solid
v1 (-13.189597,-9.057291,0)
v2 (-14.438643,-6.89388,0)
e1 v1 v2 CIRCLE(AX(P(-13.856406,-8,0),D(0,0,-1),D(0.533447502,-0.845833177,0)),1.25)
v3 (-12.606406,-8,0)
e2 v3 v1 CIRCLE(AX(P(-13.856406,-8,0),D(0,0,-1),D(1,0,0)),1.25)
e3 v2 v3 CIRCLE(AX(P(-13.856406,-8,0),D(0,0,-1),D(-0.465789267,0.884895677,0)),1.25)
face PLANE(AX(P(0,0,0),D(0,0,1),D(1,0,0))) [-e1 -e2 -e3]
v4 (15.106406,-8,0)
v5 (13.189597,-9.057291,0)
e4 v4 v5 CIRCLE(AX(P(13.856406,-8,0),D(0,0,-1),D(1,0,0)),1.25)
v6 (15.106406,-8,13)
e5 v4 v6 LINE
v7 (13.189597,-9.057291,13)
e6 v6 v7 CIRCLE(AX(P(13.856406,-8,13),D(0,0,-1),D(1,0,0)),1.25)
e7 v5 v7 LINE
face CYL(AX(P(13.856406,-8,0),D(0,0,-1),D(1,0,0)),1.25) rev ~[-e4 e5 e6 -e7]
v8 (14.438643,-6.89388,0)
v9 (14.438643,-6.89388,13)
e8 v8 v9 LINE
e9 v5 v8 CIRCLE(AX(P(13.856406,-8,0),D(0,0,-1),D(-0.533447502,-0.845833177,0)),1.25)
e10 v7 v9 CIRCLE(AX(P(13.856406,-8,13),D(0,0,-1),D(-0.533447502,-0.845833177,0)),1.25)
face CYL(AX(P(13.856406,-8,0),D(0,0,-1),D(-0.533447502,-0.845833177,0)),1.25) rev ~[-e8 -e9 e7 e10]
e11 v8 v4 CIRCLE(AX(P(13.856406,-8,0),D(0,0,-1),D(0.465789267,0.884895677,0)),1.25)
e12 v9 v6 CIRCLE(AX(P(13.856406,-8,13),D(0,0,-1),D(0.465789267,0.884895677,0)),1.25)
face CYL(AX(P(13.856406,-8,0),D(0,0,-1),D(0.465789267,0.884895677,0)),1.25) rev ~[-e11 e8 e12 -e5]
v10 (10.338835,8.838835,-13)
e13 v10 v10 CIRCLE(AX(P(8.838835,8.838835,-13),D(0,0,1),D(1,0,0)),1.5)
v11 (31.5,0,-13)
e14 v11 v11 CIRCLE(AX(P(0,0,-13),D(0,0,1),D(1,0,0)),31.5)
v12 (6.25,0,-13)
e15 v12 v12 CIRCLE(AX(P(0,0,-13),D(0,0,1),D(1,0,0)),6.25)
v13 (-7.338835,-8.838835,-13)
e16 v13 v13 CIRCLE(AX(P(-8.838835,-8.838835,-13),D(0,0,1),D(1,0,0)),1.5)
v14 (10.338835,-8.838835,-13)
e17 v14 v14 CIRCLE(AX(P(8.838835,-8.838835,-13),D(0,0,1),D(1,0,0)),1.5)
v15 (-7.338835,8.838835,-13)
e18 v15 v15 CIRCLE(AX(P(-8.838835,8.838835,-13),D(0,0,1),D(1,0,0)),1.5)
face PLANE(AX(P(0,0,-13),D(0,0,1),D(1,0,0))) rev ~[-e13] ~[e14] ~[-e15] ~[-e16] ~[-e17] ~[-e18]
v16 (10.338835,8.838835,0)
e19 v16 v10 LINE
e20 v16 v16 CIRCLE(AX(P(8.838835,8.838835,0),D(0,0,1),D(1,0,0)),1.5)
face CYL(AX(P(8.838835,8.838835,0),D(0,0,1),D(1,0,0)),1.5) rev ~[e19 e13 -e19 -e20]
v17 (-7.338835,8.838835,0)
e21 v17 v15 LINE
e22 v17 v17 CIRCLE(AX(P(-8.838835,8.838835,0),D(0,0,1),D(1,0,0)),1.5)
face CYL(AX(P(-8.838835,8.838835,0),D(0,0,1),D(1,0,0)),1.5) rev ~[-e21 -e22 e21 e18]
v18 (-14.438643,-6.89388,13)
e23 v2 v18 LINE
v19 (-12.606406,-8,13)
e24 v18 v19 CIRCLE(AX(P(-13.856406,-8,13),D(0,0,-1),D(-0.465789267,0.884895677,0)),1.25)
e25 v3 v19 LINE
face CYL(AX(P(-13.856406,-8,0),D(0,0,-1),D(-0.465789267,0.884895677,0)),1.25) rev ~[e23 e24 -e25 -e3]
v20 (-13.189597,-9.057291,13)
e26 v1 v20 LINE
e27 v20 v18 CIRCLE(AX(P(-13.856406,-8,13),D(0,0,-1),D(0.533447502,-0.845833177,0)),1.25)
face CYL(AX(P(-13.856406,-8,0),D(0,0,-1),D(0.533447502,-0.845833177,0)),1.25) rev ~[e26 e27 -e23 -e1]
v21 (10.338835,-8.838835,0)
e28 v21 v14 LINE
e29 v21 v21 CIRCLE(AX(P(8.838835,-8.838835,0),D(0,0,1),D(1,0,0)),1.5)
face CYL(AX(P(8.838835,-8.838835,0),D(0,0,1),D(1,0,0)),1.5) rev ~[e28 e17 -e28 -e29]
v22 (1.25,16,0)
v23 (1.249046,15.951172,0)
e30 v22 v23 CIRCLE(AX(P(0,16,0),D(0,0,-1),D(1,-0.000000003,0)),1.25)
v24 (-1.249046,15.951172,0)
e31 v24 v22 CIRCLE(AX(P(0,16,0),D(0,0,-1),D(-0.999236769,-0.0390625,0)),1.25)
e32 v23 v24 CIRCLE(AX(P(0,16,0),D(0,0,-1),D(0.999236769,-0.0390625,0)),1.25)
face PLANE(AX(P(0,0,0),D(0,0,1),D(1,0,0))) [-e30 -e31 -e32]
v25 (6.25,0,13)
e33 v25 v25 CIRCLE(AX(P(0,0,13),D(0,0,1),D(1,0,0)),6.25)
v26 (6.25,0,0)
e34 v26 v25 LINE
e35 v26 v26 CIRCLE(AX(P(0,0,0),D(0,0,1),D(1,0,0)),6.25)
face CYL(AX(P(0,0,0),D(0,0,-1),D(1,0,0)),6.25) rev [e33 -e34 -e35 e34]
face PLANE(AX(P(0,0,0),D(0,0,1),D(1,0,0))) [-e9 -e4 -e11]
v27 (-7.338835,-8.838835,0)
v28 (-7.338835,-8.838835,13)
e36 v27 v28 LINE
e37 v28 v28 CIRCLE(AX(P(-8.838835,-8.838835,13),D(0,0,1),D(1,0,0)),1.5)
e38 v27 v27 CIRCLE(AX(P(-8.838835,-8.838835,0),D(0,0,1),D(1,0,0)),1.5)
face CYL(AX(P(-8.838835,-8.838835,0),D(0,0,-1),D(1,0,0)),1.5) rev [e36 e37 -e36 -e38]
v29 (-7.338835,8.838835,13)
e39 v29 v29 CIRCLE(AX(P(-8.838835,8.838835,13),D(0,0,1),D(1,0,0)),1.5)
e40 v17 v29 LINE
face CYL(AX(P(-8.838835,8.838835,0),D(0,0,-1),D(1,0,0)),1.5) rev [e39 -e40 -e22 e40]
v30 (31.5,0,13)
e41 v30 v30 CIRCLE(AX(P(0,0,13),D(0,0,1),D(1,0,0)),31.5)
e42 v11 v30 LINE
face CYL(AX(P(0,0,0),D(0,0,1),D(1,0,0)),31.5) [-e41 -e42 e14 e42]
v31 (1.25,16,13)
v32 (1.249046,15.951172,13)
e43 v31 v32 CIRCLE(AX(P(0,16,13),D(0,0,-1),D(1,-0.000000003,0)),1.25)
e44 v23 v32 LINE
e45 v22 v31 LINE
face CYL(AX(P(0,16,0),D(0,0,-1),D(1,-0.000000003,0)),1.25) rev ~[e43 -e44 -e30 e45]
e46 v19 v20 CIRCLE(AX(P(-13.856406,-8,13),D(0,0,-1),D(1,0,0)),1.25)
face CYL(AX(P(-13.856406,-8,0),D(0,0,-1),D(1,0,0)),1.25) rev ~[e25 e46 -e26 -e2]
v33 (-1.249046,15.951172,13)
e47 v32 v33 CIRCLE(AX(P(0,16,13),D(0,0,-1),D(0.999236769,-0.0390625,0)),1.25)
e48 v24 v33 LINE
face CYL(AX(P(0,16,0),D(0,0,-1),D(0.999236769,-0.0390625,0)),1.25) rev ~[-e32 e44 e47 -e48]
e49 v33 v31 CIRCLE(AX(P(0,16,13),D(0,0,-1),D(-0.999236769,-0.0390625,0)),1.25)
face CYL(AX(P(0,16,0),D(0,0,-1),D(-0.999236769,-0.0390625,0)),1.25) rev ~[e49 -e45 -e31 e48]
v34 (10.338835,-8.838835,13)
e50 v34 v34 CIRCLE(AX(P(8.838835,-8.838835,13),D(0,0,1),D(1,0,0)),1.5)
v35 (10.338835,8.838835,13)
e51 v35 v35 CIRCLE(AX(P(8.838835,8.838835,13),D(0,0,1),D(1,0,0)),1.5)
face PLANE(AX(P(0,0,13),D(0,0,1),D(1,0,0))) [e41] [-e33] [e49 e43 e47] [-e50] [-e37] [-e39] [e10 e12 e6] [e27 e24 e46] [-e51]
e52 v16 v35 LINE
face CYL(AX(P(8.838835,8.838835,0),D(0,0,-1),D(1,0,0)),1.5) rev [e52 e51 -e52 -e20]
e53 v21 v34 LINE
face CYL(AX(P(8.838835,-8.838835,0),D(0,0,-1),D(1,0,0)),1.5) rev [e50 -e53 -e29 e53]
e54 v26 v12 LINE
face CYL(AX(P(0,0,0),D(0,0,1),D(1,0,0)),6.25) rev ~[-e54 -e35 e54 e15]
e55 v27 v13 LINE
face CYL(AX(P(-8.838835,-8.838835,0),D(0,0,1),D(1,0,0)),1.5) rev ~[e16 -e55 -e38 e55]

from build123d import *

# Parameters (mm, degrees)
F0_R     = 31.5
F0_R_2   = 1.5
F0_R_3   = 6.25
F1_DEPTH = 13
F2_DEPTH = 13


# Not quite as in the source:
# - a feature names something its author has since deleted; it is built from what else it names


with BuildPart() as f1:
    # F0 (on Top) → F1 (new body)
    with BuildSketch(Plane.XY):
        Circle(F0_R)
        with BuildLine():
            ThreePointArc((1.2490459616, 15.951171875), (11.7470152674, 10.8631317909), (16, 0))
            ThreePointArc((16, 0), (15.6047795357, -3.5342404619), (14.4386430447, -6.8938804043))
            ThreePointArc((14.4386430447, -6.8938804043), (14.9265222791, -7.3539720324), (15.1064064606, -8))
            ThreePointArc((15.1064064606, -8), (14.4601399606, -9.0945345408), (13.1895970831, -9.0572914707))
            ThreePointArc((13.1895970831, -9.0572914707), (0, -16), (-13.1895970831, -9.0572914707))
            ThreePointArc((-13.1895970831, -9.0572914707), (-14.9389382153, -8.625), (-14.4386430447, -6.8938804043))
            ThreePointArc((-14.4386430447, -6.8938804043), (-13.8564064606, 8), (-1.2490459616, 15.951171875))
            ThreePointArc((-1.2490459616, 15.951171875), (-0.0244187222, 17.2497614676), (1.25, 16))
            ThreePointArc((1.25, 16), (1.2497614676, 15.9755812778), (1.2490459616, 15.951171875))
        make_face(mode=Mode.SUBTRACT)
        with BuildLine():
            ThreePointArc((14.4386430447, -6.8938804043), (15.6047795357, -3.5342404619), (16, 0))
            ThreePointArc((16, 0), (11.7470152674, 10.8631317909), (1.2490459616, 15.951171875))
            ThreePointArc((1.2490459616, 15.951171875), (0, 14.75), (-1.2490459616, 15.951171875))
            ThreePointArc((-1.2490459616, 15.951171875), (-13.8564064606, 8), (-14.4386430447, -6.8938804043))
            ThreePointArc((-14.4386430447, -6.8938804043), (-13.210378493, -6.9298841815), (-12.6064064606, -8))
            ThreePointArc((-12.6064064606, -8), (-12.7618719198, -8.6037335), (-13.1895970831, -9.0572914707))
            ThreePointArc((-13.1895970831, -9.0572914707), (0, -16), (13.1895970831, -9.0572914707))
            ThreePointArc((13.1895970831, -9.0572914707), (12.7738747058, -7.375), (14.4386430447, -6.8938804043))
        make_face()
        with Locations((-8.8388347648, -8.8388347648)):
            Circle(F0_R_2, mode=Mode.SUBTRACT)
        with Locations((8.8388347648, -8.8388347648)):
            Circle(F0_R_2, mode=Mode.SUBTRACT)
        with Locations((-8.8388347648, 8.8388347648)):
            Circle(F0_R_2, mode=Mode.SUBTRACT)
        Circle(F0_R_3, mode=Mode.SUBTRACT)
        with Locations((8.8388347648, 8.8388347648)):
            Circle(F0_R_2, mode=Mode.SUBTRACT)
    extrude(amount=F1_DEPTH)

    # F0 (on Top) → F2 (join)
    with BuildSketch(Plane.XY):
        Circle(F0_R)
        with BuildLine():
            ThreePointArc((1.2490459616, 15.951171875), (11.7470152674, 10.8631317909), (16, 0))
            ThreePointArc((16, 0), (15.6047795357, -3.5342404619), (14.4386430447, -6.8938804043))
            ThreePointArc((14.4386430447, -6.8938804043), (14.9265222791, -7.3539720324), (15.1064064606, -8))
            ThreePointArc((15.1064064606, -8), (14.4601399606, -9.0945345408), (13.1895970831, -9.0572914707))
            ThreePointArc((13.1895970831, -9.0572914707), (0, -16), (-13.1895970831, -9.0572914707))
            ThreePointArc((-13.1895970831, -9.0572914707), (-14.9389382153, -8.625), (-14.4386430447, -6.8938804043))
            ThreePointArc((-14.4386430447, -6.8938804043), (-13.8564064606, 8), (-1.2490459616, 15.951171875))
            ThreePointArc((-1.2490459616, 15.951171875), (-0.0244187222, 17.2497614676), (1.25, 16))
            ThreePointArc((1.25, 16), (1.2497614676, 15.9755812778), (1.2490459616, 15.951171875))
        make_face(mode=Mode.SUBTRACT)
        with BuildLine():
            ThreePointArc((14.4386430447, -6.8938804043), (15.6047795357, -3.5342404619), (16, 0))
            ThreePointArc((16, 0), (11.7470152674, 10.8631317909), (1.2490459616, 15.951171875))
            ThreePointArc((1.2490459616, 15.951171875), (0, 14.75), (-1.2490459616, 15.951171875))
            ThreePointArc((-1.2490459616, 15.951171875), (-13.8564064606, 8), (-14.4386430447, -6.8938804043))
            ThreePointArc((-14.4386430447, -6.8938804043), (-13.210378493, -6.9298841815), (-12.6064064606, -8))
            ThreePointArc((-12.6064064606, -8), (-12.7618719198, -8.6037335), (-13.1895970831, -9.0572914707))
            ThreePointArc((-13.1895970831, -9.0572914707), (0, -16), (13.1895970831, -9.0572914707))
            ThreePointArc((13.1895970831, -9.0572914707), (12.7738747058, -7.375), (14.4386430447, -6.8938804043))
        make_face()
        with Locations((-8.8388347648, -8.8388347648)):
            Circle(F0_R_2, mode=Mode.SUBTRACT)
        with Locations((8.8388347648, -8.8388347648)):
            Circle(F0_R_2, mode=Mode.SUBTRACT)
        with Locations((-8.8388347648, 8.8388347648)):
            Circle(F0_R_2, mode=Mode.SUBTRACT)
        Circle(F0_R_3, mode=Mode.SUBTRACT)
        with Locations((8.8388347648, 8.8388347648)):
            Circle(F0_R_2, mode=Mode.SUBTRACT)
        with BuildLine():
            ThreePointArc((-1.2490459616, 15.951171875), (0, 14.75), (1.2490459616, 15.951171875))
            ThreePointArc((1.2490459616, 15.951171875), (0, 16), (-1.2490459616, 15.951171875))
        make_face()
        with BuildLine():
            ThreePointArc((-1.2490459616, 15.951171875), (0, 16), (1.2490459616, 15.951171875))
            ThreePointArc((1.2490459616, 15.951171875), (1.2497614676, 15.9755812778), (1.25, 16))
            ThreePointArc((1.25, 16), (-0.0244187222, 17.2497614676), (-1.2490459616, 15.951171875))
        make_face()
        with BuildLine():
            ThreePointArc((15.1064064606, -8), (14.9265222791, -7.3539720324), (14.4386430447, -6.8938804043))
            ThreePointArc((14.4386430447, -6.8938804043), (13.8564064606, -8), (13.1895970831, -9.0572914707))
            ThreePointArc((13.1895970831, -9.0572914707), (14.4601399606, -9.0945345408), (15.1064064606, -8))
        make_face()
        with BuildLine():
            ThreePointArc((13.1895970831, -9.0572914707), (13.8564064606, -8), (14.4386430447, -6.8938804043))
            ThreePointArc((14.4386430447, -6.8938804043), (12.7738747058, -7.375), (13.1895970831, -9.0572914707))
        make_face()
        with BuildLine():
            ThreePointArc((-12.6064064606, -8), (-13.210378493, -6.9298841815), (-14.4386430447, -6.8938804043))
            ThreePointArc((-14.4386430447, -6.8938804043), (-13.8564064606, -8), (-13.1895970831, -9.0572914707))
            ThreePointArc((-13.1895970831, -9.0572914707), (-12.7618719198, -8.6037335), (-12.6064064606, -8))
        make_face()
        with BuildLine():
            ThreePointArc((-13.1895970831, -9.0572914707), (-13.8564064606, -8), (-14.4386430447, -6.8938804043))
            ThreePointArc((-14.4386430447, -6.8938804043), (-14.9389382153, -8.625), (-13.1895970831, -9.0572914707))
        make_face()
    extrude(amount=-F2_DEPTH)


solid = f1.part
